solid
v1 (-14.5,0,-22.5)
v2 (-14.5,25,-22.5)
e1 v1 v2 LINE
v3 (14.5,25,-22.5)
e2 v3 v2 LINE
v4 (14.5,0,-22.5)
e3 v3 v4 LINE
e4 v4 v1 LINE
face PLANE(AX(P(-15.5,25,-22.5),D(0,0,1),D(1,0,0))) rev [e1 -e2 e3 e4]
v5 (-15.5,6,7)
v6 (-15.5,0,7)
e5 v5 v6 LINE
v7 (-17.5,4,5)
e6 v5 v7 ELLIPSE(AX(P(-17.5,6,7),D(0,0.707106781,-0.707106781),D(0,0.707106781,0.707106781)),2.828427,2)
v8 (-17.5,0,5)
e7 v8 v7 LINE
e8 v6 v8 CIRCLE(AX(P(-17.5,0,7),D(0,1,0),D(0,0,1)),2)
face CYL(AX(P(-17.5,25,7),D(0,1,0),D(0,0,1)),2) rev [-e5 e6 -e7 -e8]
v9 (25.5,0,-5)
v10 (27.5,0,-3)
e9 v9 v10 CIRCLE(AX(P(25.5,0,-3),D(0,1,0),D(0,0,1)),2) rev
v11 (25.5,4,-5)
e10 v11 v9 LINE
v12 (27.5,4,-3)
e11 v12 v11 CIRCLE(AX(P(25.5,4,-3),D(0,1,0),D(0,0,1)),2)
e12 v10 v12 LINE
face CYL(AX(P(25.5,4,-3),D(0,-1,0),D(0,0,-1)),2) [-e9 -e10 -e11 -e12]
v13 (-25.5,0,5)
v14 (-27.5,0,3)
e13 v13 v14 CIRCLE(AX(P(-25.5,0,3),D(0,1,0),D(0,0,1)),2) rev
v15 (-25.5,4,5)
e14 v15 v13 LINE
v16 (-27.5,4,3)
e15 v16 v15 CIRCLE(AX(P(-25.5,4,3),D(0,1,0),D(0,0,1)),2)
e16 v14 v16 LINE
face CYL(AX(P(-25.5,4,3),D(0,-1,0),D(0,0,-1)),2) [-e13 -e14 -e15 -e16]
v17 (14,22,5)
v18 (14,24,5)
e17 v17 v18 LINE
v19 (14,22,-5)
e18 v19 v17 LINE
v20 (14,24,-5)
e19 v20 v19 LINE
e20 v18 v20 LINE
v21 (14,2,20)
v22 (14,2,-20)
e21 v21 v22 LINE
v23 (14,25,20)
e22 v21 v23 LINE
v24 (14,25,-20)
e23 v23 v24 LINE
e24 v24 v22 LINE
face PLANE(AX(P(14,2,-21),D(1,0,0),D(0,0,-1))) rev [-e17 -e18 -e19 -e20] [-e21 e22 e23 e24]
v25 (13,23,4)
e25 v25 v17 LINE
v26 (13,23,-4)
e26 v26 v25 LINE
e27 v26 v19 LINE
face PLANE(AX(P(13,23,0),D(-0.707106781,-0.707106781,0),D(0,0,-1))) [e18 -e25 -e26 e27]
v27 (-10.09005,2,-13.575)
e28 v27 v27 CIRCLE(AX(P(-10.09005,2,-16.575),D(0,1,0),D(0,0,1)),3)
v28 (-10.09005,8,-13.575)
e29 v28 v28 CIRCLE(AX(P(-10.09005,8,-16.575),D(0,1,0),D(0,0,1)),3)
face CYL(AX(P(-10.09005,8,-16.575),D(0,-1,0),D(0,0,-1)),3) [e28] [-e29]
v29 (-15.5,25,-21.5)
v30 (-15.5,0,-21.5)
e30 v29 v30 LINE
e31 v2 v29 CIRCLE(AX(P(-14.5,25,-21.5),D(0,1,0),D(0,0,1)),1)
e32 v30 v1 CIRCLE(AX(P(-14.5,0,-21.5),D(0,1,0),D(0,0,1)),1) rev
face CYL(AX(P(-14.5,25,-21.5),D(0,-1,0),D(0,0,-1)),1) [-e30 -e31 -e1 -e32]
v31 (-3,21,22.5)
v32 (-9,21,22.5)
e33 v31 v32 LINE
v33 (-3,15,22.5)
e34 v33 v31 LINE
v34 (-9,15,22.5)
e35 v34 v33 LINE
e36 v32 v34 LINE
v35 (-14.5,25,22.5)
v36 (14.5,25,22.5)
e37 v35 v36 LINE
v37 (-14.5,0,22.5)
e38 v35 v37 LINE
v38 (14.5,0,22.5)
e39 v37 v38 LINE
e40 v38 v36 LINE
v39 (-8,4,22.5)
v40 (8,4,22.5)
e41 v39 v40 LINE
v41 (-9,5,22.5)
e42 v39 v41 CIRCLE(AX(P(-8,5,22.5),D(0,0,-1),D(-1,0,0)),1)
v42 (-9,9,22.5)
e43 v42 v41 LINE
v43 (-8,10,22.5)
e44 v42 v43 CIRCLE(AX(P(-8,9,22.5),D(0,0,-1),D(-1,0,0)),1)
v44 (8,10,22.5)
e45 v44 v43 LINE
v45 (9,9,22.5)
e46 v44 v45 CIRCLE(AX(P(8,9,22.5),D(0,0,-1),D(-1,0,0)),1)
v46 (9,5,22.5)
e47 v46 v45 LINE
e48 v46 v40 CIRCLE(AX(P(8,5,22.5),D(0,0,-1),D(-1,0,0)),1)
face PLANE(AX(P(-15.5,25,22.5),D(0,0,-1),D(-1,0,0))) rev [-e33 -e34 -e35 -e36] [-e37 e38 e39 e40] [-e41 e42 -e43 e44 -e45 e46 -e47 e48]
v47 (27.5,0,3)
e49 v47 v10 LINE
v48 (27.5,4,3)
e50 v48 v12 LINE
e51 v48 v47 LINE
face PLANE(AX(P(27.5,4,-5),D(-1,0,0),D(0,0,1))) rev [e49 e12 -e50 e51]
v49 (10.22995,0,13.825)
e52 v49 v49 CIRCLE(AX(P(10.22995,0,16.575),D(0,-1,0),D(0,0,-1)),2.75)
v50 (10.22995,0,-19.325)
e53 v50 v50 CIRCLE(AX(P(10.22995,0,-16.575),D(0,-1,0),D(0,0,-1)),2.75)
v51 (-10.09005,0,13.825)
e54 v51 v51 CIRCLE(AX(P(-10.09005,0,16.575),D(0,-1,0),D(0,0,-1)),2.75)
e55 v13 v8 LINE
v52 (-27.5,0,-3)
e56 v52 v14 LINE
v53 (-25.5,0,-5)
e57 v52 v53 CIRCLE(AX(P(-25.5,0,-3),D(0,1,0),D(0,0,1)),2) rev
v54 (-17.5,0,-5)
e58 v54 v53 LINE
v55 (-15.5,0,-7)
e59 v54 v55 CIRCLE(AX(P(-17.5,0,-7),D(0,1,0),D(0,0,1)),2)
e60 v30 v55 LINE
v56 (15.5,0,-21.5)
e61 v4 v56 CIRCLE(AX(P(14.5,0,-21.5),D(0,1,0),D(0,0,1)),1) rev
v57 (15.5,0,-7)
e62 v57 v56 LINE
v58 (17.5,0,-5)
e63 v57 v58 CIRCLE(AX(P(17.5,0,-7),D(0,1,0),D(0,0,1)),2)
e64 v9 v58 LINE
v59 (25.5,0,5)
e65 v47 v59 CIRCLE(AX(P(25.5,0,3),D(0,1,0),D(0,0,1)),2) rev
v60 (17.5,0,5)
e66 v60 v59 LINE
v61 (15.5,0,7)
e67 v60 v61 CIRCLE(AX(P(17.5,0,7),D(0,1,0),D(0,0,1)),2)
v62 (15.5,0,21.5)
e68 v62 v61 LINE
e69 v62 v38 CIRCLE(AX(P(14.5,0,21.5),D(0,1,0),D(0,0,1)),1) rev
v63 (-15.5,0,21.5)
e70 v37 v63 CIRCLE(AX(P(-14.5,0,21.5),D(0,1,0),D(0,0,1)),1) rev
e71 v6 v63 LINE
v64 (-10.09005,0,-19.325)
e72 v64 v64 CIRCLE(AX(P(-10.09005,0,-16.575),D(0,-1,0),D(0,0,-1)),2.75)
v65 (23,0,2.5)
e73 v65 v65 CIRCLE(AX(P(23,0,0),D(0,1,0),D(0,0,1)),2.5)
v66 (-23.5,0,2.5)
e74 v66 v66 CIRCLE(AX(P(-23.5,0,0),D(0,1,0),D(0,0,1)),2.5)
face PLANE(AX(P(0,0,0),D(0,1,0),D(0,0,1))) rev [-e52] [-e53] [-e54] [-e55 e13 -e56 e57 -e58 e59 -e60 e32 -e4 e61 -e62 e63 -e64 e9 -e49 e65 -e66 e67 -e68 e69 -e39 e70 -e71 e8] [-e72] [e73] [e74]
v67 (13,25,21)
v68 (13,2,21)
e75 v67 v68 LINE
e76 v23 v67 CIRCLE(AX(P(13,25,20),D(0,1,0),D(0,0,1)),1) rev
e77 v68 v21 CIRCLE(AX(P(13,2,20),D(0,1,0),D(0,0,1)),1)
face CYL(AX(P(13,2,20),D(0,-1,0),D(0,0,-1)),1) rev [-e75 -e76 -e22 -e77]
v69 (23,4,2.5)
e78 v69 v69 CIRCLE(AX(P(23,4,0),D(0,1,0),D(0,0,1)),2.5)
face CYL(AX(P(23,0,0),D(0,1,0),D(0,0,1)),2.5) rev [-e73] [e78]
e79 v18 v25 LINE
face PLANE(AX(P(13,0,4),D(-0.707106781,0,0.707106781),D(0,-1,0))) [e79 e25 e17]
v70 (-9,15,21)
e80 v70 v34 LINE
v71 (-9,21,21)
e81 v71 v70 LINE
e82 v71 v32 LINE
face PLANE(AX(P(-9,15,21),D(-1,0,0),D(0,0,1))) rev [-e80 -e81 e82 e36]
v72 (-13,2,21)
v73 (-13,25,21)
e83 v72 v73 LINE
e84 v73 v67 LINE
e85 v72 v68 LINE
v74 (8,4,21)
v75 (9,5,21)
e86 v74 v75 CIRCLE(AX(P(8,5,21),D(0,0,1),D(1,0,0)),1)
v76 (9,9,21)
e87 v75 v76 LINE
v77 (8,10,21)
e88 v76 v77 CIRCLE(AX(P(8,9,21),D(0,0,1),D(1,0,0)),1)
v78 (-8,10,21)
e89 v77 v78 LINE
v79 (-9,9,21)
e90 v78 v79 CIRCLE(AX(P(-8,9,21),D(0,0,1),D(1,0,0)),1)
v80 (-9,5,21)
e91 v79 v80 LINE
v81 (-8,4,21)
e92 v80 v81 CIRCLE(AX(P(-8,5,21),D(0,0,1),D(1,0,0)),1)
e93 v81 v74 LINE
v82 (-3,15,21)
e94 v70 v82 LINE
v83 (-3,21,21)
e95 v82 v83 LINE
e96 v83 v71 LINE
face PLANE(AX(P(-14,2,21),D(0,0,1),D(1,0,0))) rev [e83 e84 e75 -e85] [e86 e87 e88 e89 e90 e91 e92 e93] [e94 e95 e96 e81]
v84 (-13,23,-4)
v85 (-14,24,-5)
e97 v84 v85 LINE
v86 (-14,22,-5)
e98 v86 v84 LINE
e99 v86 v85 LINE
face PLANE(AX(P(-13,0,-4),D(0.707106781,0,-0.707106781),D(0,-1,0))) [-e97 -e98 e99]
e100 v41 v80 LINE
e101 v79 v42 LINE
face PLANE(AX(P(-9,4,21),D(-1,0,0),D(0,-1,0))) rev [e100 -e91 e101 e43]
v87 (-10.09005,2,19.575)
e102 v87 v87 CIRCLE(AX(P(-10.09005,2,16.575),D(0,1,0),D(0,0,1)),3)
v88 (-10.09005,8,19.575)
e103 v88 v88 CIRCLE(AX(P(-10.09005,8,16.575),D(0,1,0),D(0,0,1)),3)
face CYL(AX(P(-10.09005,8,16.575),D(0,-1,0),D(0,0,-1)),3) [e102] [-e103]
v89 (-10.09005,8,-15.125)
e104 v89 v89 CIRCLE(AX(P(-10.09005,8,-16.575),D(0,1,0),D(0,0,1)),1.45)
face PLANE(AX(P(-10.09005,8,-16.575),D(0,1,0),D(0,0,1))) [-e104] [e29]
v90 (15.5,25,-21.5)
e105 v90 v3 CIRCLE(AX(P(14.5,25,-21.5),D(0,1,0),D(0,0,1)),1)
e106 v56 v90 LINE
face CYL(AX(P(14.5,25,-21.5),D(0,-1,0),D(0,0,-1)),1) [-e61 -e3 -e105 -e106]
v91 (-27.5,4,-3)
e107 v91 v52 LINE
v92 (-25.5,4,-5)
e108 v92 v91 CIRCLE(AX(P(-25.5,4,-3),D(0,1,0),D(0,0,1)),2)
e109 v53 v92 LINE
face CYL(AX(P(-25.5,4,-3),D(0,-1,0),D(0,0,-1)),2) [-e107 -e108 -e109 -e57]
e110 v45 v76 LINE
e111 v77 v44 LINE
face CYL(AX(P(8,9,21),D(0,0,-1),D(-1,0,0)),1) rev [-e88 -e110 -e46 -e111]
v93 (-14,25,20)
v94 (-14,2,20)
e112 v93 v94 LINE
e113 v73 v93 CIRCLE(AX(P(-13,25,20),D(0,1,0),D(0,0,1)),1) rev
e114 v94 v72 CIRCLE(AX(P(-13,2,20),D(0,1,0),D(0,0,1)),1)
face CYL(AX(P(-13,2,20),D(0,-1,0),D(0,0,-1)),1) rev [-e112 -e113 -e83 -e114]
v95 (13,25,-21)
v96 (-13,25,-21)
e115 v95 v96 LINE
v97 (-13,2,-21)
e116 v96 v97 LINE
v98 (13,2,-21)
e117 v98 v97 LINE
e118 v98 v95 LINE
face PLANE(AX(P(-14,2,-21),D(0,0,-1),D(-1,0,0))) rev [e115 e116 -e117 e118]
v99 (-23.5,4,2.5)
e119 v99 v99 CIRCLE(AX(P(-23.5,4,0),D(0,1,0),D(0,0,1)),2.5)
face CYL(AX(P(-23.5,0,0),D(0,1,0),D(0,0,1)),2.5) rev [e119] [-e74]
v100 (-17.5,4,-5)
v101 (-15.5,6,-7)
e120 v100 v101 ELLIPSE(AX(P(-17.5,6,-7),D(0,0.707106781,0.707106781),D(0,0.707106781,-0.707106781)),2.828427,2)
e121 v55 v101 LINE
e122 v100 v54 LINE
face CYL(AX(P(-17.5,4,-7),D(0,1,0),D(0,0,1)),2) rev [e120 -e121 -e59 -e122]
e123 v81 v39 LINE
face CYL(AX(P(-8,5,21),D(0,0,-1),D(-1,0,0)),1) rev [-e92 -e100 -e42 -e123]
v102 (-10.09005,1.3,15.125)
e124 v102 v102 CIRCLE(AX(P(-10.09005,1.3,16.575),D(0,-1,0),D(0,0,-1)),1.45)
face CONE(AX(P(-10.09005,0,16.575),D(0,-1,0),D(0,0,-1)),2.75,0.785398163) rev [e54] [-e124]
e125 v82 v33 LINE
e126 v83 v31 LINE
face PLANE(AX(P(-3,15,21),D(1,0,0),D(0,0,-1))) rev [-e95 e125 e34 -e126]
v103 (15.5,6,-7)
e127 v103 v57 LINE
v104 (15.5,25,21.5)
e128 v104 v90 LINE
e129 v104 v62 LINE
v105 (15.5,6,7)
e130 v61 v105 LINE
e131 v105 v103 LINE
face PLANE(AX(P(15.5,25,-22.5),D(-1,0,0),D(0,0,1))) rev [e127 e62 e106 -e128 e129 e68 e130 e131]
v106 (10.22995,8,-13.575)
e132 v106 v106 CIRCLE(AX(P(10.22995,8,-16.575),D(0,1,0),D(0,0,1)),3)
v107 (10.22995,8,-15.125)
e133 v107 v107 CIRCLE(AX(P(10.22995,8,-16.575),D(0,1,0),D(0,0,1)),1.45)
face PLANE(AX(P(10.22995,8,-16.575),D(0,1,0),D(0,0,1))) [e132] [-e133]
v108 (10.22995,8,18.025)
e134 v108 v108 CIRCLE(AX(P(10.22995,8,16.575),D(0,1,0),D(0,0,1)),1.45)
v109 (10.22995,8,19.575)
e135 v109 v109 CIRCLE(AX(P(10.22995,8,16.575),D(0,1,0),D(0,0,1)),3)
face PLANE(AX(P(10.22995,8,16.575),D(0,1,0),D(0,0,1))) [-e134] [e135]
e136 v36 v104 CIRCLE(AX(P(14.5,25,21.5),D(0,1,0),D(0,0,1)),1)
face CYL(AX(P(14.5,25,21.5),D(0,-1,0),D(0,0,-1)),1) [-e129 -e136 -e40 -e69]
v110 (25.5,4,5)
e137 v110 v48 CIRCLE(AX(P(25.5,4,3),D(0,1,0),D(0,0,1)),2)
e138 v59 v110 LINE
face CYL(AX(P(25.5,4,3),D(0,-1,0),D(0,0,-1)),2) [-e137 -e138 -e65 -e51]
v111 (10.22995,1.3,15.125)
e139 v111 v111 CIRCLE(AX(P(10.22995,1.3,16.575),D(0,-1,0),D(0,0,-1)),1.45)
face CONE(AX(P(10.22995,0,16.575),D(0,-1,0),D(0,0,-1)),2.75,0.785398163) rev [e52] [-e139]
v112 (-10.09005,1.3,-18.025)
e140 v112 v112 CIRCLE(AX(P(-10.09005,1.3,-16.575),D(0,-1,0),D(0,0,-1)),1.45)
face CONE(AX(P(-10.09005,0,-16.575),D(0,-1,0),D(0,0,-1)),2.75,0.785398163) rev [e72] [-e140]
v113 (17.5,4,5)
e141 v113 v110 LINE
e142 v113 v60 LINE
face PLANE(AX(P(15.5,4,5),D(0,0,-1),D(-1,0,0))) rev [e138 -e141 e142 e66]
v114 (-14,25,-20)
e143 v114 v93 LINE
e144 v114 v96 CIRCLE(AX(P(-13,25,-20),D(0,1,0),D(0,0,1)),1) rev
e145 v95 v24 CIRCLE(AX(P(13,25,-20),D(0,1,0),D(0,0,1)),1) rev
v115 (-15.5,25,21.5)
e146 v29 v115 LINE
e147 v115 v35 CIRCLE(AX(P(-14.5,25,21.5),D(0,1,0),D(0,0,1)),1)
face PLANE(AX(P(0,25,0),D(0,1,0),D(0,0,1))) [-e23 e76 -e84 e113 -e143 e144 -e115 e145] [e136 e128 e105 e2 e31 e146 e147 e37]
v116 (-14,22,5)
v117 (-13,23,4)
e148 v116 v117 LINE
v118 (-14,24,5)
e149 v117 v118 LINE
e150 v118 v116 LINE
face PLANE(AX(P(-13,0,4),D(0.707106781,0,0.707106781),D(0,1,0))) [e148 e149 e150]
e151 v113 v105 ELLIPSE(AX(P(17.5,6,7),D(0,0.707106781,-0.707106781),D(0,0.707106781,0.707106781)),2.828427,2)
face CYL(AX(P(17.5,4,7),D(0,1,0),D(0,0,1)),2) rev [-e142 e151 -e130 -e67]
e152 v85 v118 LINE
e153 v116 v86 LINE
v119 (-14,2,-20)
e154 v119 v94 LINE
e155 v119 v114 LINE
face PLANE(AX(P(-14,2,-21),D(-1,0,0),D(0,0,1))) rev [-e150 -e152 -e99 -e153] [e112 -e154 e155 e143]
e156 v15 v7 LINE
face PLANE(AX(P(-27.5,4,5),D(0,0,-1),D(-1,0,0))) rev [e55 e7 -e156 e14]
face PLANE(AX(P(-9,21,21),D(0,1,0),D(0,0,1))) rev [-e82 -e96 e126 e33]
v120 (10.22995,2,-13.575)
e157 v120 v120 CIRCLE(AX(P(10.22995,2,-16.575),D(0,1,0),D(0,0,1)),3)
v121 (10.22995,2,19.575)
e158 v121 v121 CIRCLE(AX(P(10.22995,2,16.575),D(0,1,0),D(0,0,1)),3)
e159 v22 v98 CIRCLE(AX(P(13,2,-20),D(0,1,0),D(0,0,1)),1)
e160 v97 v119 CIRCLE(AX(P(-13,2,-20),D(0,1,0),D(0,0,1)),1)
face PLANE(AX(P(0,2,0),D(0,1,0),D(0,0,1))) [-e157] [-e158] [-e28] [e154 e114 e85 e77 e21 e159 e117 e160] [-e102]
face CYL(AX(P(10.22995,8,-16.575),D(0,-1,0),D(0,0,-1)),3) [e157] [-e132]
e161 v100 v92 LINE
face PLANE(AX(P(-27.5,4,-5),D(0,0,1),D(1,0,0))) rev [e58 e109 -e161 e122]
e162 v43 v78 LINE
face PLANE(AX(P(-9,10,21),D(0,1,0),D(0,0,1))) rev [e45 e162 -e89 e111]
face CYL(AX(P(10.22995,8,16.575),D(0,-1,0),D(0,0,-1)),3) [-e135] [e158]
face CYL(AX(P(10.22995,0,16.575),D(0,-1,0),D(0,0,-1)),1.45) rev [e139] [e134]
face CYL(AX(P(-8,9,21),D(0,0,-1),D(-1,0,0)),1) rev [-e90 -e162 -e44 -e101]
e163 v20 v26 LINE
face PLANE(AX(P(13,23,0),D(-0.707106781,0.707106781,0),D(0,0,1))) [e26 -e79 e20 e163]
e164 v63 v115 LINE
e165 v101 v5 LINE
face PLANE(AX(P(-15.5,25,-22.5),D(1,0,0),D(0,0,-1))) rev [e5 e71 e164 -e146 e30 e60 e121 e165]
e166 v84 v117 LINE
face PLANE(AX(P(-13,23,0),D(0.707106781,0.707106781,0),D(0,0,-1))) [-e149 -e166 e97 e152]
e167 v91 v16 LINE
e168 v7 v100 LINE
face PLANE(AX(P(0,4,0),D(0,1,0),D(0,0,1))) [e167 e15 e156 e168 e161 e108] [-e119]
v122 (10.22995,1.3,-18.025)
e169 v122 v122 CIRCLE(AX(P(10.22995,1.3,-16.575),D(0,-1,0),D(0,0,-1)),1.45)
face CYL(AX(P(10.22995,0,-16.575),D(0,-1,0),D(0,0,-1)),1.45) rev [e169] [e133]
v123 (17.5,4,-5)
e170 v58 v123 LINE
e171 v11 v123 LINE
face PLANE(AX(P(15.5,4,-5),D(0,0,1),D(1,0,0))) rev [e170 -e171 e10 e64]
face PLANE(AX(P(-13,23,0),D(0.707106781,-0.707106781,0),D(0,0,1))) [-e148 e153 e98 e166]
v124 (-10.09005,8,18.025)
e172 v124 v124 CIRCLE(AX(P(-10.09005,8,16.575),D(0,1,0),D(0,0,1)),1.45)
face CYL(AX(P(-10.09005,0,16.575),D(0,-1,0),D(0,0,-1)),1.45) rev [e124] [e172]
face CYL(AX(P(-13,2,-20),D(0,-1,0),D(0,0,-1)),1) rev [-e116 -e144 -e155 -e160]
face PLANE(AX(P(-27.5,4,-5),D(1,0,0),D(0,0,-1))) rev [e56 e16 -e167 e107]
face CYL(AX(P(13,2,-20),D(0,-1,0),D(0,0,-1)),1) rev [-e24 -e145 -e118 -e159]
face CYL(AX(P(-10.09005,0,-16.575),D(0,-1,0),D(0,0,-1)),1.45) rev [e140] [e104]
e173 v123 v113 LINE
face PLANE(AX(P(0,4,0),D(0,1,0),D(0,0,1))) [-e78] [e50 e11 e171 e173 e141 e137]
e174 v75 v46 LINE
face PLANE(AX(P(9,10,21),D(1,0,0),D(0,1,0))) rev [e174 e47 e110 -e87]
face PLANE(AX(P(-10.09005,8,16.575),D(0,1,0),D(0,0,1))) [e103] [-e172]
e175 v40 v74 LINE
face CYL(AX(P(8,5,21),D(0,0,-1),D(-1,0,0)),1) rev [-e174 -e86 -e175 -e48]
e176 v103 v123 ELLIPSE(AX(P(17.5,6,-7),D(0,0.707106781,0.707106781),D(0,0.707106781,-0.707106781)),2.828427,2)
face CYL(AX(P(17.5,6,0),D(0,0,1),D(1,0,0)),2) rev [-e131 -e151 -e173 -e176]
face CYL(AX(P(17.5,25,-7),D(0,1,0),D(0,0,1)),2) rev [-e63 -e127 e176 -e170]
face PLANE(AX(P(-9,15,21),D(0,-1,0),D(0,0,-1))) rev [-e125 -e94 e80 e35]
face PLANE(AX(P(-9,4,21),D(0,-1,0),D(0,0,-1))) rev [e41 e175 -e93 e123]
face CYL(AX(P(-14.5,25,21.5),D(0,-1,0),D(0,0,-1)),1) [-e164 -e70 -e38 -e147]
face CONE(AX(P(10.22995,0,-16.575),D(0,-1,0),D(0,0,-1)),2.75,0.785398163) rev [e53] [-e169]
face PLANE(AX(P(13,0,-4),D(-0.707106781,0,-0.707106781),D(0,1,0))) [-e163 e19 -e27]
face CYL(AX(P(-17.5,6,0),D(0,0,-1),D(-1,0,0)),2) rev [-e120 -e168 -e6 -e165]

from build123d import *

# Parameters (mm, degrees)
SKETCH1_W                                         = 31
SKETCH1_H                                         = 45
BOSS_EXTRUDE1_DEPTH                               = 25
SKETCH2_W                                         = 28
SKETCH2_H                                         = 42
CUT_EXTRUDE1_DEPTH                                = 23
SKETCH3_R                                         = 3
BOSS_EXTRUDE5_DEPTH                               = 6
SKETCH4_W                                         = 18
SKETCH4_H                                         = 6
SKETCH4_W_2                                       = 6
CUT_EXTRUDE2_DEPTH                                = 1.5
CSK_FOR_M2_5_FLAT_HEAD_MACHINE_SCREW1_D           = 2.9
CSK_FOR_M2_5_FLAT_HEAD_MACHINE_SCREW1_CSINK_D     = 5.5
CSK_FOR_M2_5_FLAT_HEAD_MACHINE_SCREW1_CSINK_ANGLE = 90
FILLET2_R                                         = 1
SKETCH8_W                                         = 12
SKETCH8_H                                         = 10
BOSS_EXTRUDE6_DEPTH                               = 4
SKETCH9_R                                         = 2.5
CUT_EXTRUDE3_DEPTH                                = 4
FILLET3_R                                         = 2
FILLET4_R                                         = 2
SKETCH10_W                                        = 10
SKETCH10_H                                        = 2
BOSS_EXTRUDE7_DEPTH                               = 1
CHAMFER1_SIZE                                     = 1
SKETCH11_W                                        = 10
SKETCH11_H                                        = 2
BOSS_EXTRUDE8_DEPTH                               = 1
CHAMFER2_SIZE                                     = 1
FILLET5_R                                         = 2


with BuildPart() as part:
    # Sketch1 → Boss-Extrude1 (new body)
    with BuildSketch(Plane(origin=(0, 0, 0), x_dir=(1, 0, 0), z_dir=(0, 1, 0))):
        Rectangle(SKETCH1_W, SKETCH1_H)
    extrude(amount=BOSS_EXTRUDE1_DEPTH)

    # Sketch2 → Cut-Extrude1 (cut)
    with BuildSketch(Plane(origin=(0, 25, 0), x_dir=(1, 0, 0), z_dir=(0, 1, 0))):
        Rectangle(SKETCH2_W, SKETCH2_H)
    extrude(amount=-CUT_EXTRUDE1_DEPTH, mode=Mode.SUBTRACT)

    # Sketch3 → Boss-Extrude5 (add)
    with BuildSketch(Plane(origin=(0, 2, 0), x_dir=(1, 0, 0), z_dir=(0, 1, 0))):
        with Locations(Location((-10.090049644, 16.575, 0), (0, 0, 270))):
            Circle(SKETCH3_R)
        with Locations(Location((10.229950356, 16.575, 0), (0, 0, 270))):
            Circle(SKETCH3_R)
        with Locations(Location((10.229950356, -16.575, 0), (0, 0, 270))):
            Circle(SKETCH3_R)
        with Locations(Location((-10.090049644, -16.575, 0), (0, 0, 270))):
            Circle(SKETCH3_R)
    extrude(amount=BOSS_EXTRUDE5_DEPTH)

    # Sketch4 → Cut-Extrude2 (cut)
    with BuildSketch(Plane.XY.offset(22.5)):
        with Locations((0, 7)):
            Rectangle(SKETCH4_W, SKETCH4_H)
        with Locations((-6, 18)):
            Rectangle(SKETCH4_W_2, SKETCH4_H)
    extrude(amount=-CUT_EXTRUDE2_DEPTH, mode=Mode.SUBTRACT)

    # CSK for M2.5 Flat Head Machine Screw1 (through all)
    with Locations(Plane(origin=(0, 0, 0), x_dir=(-1, 0, 0), z_dir=(0, -1, 0))):
        with Locations((-10.229950356, -16.575), (10.090049644, -16.575), (10.090049644, 16.575), (-10.229950356, 16.575)):
            CounterSinkHole(CSK_FOR_M2_5_FLAT_HEAD_MACHINE_SCREW1_D / 2, CSK_FOR_M2_5_FLAT_HEAD_MACHINE_SCREW1_CSINK_D / 2, counter_sink_angle=CSK_FOR_M2_5_FLAT_HEAD_MACHINE_SCREW1_CSINK_ANGLE)

    # Fillet2
    fillet2_edges = [part.edges().sort_by_distance(p)[0] for p in [
        (14, 13.5, -21),
        (14, 13.5, 21),
        (-14, 13.5, 21),
        (-14, 13.5, -21),
        (-9, 4, 21.75),
        (-9, 10, 21.75),
        (9, 10, 21.75),
        (9, 4, 21.75),
        (15.5, 12.5, 22.5),
        (-15.5, 12.5, 22.5),
        (-15.5, 12.5, -22.5),
        (15.5, 12.5, -22.5),
    ]]
    fillet(fillet2_edges, radius=FILLET2_R)

    # Sketch8 → Boss-Extrude6 (add)
    with BuildSketch(Plane(origin=(0, 0, 0), x_dir=(1, 0, 0), z_dir=(0, 1, 0))):
        with Locations((21.5, 0)):
            Rectangle(SKETCH8_W, SKETCH8_H)
        with Locations((-21.5, 0)):
            Rectangle(SKETCH8_W, SKETCH8_H)
    extrude(amount=BOSS_EXTRUDE6_DEPTH)

    # Sketch9 → Cut-Extrude3 (cut)
    with BuildSketch(Plane(origin=(0, 4, 0), x_dir=(1, 0, 0), z_dir=(0, 1, 0))):
        with Locations(Location((23, 0, 0), (0, 0, 270))):
            Circle(SKETCH9_R)
        with Locations(Location((-23.5, 0, 0), (0, 0, 270))):
            Circle(SKETCH9_R)
    extrude(amount=-CUT_EXTRUDE3_DEPTH, mode=Mode.SUBTRACT)

    # Fillet3
    fillet3_edges = [part.edges().sort_by_distance(p)[0] for p in [
        (-15.5, 2, 5),
        (-15.5, 2, -5),
        (15.5, 2, -5),
        (15.5, 2, 5),
    ]]
    fillet(fillet3_edges, radius=FILLET3_R)

    # Fillet4
    fillet4_edges = [part.edges().sort_by_distance(p)[0] for p in [
        (15.5, 4, 0),
        (-15.5, 4, 0),
    ]]
    fillet(fillet4_edges, radius=FILLET4_R)

    # Sketch10 → Boss-Extrude7 (add)
    with BuildSketch(Plane(origin=(-14, 0, 0), x_dir=(0, 0, -1), z_dir=(1, 0, 0))):
        with Locations((0, 23)):
            Rectangle(SKETCH10_W, SKETCH10_H)
    extrude(amount=BOSS_EXTRUDE7_DEPTH)

    # Chamfer1
    chamfer1_edges = [part.edges().sort_by_distance(p)[0] for p in [
        (-13, 23, 5),
        (-13, 22, 0),
        (-13, 23, -5),
        (-13, 24, 0),
    ]]
    chamfer(chamfer1_edges, length=CHAMFER1_SIZE - 0.0001)  # a hair under: the kernel refuses the full size

    # Sketch11 → Boss-Extrude8 (add)
    with BuildSketch(Plane.ZY.offset(-14)):
        with Locations((0, 23)):
            Rectangle(SKETCH11_W, SKETCH11_H)
    extrude(amount=BOSS_EXTRUDE8_DEPTH)

    # Chamfer2
    chamfer2_edges = [part.edges().sort_by_distance(p)[0] for p in [
        (13, 23, 5),
        (13, 24, 0),
        (13, 22, 0),
        (13, 23, -5),
    ]]
    chamfer(chamfer2_edges, length=CHAMFER2_SIZE - 0.0001)  # a hair under: the kernel refuses the full size

    # Fillet5
    fillet5_edges = [part.edges().sort_by_distance(p)[0] for p in [
        (-27.5, 2, -5),
        (-27.5, 2, 5),
        (27.5, 2, 5),
        (27.5, 2, -5),
    ]]
    fillet(fillet5_edges, radius=FILLET5_R)


solid = part.part
